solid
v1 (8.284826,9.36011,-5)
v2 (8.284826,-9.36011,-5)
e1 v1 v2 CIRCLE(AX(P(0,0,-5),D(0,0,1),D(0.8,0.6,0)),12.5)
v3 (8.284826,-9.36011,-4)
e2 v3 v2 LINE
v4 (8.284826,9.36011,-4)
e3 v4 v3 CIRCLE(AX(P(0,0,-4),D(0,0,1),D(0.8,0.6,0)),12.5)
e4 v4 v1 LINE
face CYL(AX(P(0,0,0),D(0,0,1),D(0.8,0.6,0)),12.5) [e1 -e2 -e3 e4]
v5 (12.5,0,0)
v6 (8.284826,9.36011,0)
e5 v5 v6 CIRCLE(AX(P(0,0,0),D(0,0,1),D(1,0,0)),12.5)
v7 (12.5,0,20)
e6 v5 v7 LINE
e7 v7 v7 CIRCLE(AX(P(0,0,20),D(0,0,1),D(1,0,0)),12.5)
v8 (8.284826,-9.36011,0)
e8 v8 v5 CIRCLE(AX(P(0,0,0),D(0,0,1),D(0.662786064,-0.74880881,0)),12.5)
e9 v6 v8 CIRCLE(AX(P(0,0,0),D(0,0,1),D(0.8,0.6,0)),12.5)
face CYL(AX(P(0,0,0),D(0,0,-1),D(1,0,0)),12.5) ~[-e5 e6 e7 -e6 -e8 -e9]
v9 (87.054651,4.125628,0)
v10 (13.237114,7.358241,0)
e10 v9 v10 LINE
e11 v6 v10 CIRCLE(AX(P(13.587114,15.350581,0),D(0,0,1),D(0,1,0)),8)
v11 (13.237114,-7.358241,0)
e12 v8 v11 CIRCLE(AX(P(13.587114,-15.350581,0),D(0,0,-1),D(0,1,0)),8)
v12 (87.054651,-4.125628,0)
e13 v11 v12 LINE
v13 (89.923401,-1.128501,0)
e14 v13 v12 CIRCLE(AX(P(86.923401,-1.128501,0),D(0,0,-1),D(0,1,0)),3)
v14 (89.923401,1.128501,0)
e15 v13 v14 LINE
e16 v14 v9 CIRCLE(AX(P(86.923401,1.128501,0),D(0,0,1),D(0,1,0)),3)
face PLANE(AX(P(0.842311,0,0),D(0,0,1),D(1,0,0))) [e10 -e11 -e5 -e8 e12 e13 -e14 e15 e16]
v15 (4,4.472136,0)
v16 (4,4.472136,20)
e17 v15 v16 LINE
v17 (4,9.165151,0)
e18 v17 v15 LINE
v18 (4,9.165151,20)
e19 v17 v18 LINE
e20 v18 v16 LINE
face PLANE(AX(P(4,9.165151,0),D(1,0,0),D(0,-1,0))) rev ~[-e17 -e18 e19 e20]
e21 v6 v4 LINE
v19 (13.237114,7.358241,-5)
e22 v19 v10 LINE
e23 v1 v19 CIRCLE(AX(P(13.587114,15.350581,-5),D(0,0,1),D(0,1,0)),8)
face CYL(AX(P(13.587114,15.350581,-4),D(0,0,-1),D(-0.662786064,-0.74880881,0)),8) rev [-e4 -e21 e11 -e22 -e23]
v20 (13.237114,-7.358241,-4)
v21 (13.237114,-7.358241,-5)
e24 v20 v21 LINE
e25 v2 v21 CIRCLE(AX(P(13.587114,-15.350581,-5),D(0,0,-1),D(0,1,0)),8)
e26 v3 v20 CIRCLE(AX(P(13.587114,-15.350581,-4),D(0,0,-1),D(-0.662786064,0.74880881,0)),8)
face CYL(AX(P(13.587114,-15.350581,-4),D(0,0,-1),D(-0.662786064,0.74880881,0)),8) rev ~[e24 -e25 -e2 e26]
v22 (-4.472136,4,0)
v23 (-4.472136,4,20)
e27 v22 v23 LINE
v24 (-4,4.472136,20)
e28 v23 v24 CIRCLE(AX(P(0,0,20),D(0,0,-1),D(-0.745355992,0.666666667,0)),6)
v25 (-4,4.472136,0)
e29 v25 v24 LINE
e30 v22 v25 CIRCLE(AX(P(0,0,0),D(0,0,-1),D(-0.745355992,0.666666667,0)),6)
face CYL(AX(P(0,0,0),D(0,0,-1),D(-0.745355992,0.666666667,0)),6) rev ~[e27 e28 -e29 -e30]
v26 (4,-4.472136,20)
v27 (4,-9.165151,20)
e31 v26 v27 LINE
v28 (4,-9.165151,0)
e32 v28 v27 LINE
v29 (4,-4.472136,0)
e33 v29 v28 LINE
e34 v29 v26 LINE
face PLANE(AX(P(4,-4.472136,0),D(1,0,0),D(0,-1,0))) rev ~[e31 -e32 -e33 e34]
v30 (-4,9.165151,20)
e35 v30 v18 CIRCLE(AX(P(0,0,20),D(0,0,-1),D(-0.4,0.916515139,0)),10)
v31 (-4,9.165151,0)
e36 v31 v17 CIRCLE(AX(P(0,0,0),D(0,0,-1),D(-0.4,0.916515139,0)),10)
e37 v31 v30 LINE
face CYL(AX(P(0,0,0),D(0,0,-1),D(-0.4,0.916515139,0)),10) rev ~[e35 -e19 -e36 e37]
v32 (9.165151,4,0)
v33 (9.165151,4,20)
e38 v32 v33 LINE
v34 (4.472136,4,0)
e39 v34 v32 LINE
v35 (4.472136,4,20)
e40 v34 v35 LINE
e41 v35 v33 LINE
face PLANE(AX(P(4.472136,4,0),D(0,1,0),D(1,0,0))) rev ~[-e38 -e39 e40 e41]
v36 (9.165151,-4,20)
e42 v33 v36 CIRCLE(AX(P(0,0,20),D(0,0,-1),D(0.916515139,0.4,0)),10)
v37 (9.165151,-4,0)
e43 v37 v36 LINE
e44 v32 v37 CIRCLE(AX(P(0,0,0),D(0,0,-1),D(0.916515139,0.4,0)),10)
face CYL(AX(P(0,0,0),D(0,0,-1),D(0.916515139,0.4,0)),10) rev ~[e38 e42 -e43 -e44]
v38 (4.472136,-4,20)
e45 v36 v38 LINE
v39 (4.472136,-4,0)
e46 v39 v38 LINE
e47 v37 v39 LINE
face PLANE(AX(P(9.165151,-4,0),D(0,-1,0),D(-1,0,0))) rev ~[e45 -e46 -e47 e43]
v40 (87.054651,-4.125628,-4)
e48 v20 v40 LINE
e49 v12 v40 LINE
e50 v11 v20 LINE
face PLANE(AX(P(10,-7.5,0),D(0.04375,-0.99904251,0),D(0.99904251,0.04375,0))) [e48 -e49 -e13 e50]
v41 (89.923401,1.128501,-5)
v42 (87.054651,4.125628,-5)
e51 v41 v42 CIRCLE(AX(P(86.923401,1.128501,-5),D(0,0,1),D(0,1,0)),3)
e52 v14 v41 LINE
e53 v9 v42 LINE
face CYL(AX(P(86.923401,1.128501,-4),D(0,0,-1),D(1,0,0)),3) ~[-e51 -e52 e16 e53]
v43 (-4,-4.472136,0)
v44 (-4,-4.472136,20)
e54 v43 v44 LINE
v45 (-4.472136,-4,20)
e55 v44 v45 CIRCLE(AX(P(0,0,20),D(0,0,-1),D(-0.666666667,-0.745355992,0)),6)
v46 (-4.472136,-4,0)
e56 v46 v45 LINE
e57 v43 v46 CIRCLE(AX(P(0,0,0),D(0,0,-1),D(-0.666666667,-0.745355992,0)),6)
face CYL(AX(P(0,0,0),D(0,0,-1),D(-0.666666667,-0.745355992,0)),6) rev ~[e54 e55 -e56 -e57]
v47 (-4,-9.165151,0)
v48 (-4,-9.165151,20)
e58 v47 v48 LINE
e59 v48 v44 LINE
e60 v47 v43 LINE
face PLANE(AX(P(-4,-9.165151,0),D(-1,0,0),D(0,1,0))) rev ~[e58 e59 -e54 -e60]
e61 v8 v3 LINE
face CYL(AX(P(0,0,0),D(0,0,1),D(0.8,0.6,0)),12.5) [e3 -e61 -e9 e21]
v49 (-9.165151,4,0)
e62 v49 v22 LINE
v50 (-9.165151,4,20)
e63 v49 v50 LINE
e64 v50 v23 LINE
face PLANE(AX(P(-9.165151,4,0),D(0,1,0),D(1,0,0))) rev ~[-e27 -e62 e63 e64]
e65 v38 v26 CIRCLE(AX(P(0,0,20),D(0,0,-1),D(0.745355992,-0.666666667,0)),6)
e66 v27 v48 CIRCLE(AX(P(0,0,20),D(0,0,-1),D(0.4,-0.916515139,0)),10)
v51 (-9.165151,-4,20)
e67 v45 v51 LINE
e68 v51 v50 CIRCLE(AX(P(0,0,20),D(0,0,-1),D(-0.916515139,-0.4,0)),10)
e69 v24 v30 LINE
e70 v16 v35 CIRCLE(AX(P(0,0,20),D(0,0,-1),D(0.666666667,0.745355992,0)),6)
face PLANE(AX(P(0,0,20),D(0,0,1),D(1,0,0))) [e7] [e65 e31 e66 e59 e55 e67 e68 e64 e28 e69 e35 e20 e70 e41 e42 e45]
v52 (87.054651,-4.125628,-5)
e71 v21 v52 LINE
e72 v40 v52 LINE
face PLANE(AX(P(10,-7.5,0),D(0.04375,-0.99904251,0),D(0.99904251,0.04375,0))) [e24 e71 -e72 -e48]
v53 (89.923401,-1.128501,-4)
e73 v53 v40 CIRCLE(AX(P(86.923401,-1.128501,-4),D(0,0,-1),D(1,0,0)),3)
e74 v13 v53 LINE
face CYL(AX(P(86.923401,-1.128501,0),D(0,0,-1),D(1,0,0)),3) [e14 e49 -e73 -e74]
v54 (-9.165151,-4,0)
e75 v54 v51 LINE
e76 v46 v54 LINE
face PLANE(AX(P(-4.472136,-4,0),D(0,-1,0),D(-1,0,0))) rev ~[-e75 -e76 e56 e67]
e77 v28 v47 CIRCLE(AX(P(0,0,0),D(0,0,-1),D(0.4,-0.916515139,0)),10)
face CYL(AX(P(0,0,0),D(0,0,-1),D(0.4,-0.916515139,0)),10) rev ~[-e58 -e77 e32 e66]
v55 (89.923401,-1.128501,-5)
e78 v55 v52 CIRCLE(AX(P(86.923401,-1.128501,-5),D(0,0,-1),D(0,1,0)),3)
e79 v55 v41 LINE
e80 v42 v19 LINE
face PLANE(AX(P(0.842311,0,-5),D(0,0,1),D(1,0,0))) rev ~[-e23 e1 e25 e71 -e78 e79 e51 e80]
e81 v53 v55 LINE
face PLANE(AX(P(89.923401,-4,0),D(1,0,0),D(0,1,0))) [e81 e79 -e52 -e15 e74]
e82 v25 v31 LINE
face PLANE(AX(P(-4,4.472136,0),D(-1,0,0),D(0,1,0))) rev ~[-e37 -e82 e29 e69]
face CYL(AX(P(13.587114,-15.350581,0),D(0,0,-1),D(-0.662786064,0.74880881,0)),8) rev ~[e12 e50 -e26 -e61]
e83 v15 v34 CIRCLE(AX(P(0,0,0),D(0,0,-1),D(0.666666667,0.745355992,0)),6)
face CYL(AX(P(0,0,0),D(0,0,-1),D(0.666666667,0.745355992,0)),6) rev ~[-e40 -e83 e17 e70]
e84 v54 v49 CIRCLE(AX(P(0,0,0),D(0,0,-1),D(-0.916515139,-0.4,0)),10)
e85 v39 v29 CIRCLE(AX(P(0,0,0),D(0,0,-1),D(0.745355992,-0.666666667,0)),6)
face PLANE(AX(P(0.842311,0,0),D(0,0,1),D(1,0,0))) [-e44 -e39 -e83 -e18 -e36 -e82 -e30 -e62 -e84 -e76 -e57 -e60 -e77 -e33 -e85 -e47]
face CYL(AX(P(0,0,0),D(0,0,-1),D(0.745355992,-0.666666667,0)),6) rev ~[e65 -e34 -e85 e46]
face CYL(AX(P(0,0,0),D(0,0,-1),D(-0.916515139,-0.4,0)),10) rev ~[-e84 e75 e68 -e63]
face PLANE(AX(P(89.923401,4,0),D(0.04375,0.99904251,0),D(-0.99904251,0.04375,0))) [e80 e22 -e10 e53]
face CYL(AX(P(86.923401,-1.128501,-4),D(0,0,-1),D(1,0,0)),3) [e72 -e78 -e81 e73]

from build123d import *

# Parameters (mm, degrees)
F0_R     = 12.5
F1_DEPTH = 20
F3_DEPTH = 5
F4_DEPTH = 4
F5_R     = 8
F6_R     = 3


with BuildPart() as f1:
    # F0 (on Top) → F1 (new body)
    with BuildSketch(Plane.XY):
        Circle(F0_R)
        with BuildLine():
            ThreePointArc((-9.1651513899, -4), (-10, 0), (-9.1651513899, 4))
            Line((-9.1651513899, 4), (-4.472135955, 4))
            ThreePointArc((-4.472135955, 4), (-4.2426406871, 4.2426406871), (-4, 4.472135955))
            Line((-4, 4.472135955), (-4, 9.1651513899))
            ThreePointArc((-4, 9.1651513899), (0, 10), (4, 9.1651513899))
            Line((4, 9.1651513899), (4, 4.472135955))
            ThreePointArc((4, 4.472135955), (4.2426406871, 4.2426406871), (4.472135955, 4))
            Line((4.472135955, 4), (9.1651513899, 4))
            ThreePointArc((9.1651513899, 4), (10, 0), (9.1651513899, -4))
            Line((9.1651513899, -4), (4.472135955, -4))
            ThreePointArc((4.472135955, -4), (4.2426406871, -4.2426406871), (4, -4.472135955))
            Line((4, -4.472135955), (4, -9.1651513899))
            ThreePointArc((4, -9.1651513899), (0, -10), (-4, -9.1651513899))
            Line((-4, -9.1651513899), (-4, -4.472135955))
            ThreePointArc((-4, -4.472135955), (-4.2426406871, -4.2426406871), (-4.472135955, -4))
            Line((-4.472135955, -4), (-9.1651513899, -4))
        make_face(mode=Mode.SUBTRACT)
    extrude(amount=F1_DEPTH)

    # F2 (on Top) → F3 (join)
    with BuildSketch(Plane.XY):
        with BuildLine():
            ThreePointArc((10, -7.5), (11.8585412256, -3.9528470752), (12.5, 0))
            ThreePointArc((12.5, 0), (11.8585412256, 3.9528470752), (10, 7.5))
            ThreePointArc((10, 7.5), (-12.5, 0), (10, -7.5))
        make_face()
        with BuildLine():
            ThreePointArc((10, 7.5), (11.8585412256, 3.9528470752), (12.5, 0))
            ThreePointArc((12.5, 0), (11.8585412256, -3.9528470752), (10, -7.5))
            Line((10, -7.5), (89.9234008285, -4))
            Line((89.9234008285, -4), (89.9234008285, 0))
            Line((89.9234008285, 0), (89.9234008285, 4))
            Line((89.9234008285, 4), (10, 7.5))
        make_face()
    extrude(amount=-F3_DEPTH)

    # F2 (on Top) → F4 (join)
    with BuildSketch(Plane.XY):
        with BuildLine():
            ThreePointArc((10, -7.5), (11.8585412256, -3.9528470752), (12.5, 0))
            ThreePointArc((12.5, 0), (11.8585412256, 3.9528470752), (10, 7.5))
            ThreePointArc((10, 7.5), (-12.5, 0), (10, -7.5))
        make_face()
        with BuildLine():
            ThreePointArc((10, 7.5), (11.8585412256, 3.9528470752), (12.5, 0))
            ThreePointArc((12.5, 0), (11.8585412256, -3.9528470752), (10, -7.5))
            Line((10, -7.5), (89.9234008285, -4))
            Line((89.9234008285, -4), (89.9234008285, 0))
            Line((89.9234008285, 0), (89.9234008285, 4))
            Line((89.9234008285, 4), (10, 7.5))
        make_face()
    extrude(amount=-F4_DEPTH)

    # F5
    f5_edges = [f1.edges().sort_by_distance(p)[0] for p in [
        (10, 7.5, -2.5),
        (10, -7.5, -2.5),
    ]]
    fillet(f5_edges, radius=F5_R)

    # F6
    f6_edges = [f1.edges().sort_by_distance(p)[0] for p in [
        (89.923401, 4, -2.5),
        (89.923401, -4, -2.5),
    ]]
    fillet(f6_edges, radius=F6_R)


solid = f1.part
